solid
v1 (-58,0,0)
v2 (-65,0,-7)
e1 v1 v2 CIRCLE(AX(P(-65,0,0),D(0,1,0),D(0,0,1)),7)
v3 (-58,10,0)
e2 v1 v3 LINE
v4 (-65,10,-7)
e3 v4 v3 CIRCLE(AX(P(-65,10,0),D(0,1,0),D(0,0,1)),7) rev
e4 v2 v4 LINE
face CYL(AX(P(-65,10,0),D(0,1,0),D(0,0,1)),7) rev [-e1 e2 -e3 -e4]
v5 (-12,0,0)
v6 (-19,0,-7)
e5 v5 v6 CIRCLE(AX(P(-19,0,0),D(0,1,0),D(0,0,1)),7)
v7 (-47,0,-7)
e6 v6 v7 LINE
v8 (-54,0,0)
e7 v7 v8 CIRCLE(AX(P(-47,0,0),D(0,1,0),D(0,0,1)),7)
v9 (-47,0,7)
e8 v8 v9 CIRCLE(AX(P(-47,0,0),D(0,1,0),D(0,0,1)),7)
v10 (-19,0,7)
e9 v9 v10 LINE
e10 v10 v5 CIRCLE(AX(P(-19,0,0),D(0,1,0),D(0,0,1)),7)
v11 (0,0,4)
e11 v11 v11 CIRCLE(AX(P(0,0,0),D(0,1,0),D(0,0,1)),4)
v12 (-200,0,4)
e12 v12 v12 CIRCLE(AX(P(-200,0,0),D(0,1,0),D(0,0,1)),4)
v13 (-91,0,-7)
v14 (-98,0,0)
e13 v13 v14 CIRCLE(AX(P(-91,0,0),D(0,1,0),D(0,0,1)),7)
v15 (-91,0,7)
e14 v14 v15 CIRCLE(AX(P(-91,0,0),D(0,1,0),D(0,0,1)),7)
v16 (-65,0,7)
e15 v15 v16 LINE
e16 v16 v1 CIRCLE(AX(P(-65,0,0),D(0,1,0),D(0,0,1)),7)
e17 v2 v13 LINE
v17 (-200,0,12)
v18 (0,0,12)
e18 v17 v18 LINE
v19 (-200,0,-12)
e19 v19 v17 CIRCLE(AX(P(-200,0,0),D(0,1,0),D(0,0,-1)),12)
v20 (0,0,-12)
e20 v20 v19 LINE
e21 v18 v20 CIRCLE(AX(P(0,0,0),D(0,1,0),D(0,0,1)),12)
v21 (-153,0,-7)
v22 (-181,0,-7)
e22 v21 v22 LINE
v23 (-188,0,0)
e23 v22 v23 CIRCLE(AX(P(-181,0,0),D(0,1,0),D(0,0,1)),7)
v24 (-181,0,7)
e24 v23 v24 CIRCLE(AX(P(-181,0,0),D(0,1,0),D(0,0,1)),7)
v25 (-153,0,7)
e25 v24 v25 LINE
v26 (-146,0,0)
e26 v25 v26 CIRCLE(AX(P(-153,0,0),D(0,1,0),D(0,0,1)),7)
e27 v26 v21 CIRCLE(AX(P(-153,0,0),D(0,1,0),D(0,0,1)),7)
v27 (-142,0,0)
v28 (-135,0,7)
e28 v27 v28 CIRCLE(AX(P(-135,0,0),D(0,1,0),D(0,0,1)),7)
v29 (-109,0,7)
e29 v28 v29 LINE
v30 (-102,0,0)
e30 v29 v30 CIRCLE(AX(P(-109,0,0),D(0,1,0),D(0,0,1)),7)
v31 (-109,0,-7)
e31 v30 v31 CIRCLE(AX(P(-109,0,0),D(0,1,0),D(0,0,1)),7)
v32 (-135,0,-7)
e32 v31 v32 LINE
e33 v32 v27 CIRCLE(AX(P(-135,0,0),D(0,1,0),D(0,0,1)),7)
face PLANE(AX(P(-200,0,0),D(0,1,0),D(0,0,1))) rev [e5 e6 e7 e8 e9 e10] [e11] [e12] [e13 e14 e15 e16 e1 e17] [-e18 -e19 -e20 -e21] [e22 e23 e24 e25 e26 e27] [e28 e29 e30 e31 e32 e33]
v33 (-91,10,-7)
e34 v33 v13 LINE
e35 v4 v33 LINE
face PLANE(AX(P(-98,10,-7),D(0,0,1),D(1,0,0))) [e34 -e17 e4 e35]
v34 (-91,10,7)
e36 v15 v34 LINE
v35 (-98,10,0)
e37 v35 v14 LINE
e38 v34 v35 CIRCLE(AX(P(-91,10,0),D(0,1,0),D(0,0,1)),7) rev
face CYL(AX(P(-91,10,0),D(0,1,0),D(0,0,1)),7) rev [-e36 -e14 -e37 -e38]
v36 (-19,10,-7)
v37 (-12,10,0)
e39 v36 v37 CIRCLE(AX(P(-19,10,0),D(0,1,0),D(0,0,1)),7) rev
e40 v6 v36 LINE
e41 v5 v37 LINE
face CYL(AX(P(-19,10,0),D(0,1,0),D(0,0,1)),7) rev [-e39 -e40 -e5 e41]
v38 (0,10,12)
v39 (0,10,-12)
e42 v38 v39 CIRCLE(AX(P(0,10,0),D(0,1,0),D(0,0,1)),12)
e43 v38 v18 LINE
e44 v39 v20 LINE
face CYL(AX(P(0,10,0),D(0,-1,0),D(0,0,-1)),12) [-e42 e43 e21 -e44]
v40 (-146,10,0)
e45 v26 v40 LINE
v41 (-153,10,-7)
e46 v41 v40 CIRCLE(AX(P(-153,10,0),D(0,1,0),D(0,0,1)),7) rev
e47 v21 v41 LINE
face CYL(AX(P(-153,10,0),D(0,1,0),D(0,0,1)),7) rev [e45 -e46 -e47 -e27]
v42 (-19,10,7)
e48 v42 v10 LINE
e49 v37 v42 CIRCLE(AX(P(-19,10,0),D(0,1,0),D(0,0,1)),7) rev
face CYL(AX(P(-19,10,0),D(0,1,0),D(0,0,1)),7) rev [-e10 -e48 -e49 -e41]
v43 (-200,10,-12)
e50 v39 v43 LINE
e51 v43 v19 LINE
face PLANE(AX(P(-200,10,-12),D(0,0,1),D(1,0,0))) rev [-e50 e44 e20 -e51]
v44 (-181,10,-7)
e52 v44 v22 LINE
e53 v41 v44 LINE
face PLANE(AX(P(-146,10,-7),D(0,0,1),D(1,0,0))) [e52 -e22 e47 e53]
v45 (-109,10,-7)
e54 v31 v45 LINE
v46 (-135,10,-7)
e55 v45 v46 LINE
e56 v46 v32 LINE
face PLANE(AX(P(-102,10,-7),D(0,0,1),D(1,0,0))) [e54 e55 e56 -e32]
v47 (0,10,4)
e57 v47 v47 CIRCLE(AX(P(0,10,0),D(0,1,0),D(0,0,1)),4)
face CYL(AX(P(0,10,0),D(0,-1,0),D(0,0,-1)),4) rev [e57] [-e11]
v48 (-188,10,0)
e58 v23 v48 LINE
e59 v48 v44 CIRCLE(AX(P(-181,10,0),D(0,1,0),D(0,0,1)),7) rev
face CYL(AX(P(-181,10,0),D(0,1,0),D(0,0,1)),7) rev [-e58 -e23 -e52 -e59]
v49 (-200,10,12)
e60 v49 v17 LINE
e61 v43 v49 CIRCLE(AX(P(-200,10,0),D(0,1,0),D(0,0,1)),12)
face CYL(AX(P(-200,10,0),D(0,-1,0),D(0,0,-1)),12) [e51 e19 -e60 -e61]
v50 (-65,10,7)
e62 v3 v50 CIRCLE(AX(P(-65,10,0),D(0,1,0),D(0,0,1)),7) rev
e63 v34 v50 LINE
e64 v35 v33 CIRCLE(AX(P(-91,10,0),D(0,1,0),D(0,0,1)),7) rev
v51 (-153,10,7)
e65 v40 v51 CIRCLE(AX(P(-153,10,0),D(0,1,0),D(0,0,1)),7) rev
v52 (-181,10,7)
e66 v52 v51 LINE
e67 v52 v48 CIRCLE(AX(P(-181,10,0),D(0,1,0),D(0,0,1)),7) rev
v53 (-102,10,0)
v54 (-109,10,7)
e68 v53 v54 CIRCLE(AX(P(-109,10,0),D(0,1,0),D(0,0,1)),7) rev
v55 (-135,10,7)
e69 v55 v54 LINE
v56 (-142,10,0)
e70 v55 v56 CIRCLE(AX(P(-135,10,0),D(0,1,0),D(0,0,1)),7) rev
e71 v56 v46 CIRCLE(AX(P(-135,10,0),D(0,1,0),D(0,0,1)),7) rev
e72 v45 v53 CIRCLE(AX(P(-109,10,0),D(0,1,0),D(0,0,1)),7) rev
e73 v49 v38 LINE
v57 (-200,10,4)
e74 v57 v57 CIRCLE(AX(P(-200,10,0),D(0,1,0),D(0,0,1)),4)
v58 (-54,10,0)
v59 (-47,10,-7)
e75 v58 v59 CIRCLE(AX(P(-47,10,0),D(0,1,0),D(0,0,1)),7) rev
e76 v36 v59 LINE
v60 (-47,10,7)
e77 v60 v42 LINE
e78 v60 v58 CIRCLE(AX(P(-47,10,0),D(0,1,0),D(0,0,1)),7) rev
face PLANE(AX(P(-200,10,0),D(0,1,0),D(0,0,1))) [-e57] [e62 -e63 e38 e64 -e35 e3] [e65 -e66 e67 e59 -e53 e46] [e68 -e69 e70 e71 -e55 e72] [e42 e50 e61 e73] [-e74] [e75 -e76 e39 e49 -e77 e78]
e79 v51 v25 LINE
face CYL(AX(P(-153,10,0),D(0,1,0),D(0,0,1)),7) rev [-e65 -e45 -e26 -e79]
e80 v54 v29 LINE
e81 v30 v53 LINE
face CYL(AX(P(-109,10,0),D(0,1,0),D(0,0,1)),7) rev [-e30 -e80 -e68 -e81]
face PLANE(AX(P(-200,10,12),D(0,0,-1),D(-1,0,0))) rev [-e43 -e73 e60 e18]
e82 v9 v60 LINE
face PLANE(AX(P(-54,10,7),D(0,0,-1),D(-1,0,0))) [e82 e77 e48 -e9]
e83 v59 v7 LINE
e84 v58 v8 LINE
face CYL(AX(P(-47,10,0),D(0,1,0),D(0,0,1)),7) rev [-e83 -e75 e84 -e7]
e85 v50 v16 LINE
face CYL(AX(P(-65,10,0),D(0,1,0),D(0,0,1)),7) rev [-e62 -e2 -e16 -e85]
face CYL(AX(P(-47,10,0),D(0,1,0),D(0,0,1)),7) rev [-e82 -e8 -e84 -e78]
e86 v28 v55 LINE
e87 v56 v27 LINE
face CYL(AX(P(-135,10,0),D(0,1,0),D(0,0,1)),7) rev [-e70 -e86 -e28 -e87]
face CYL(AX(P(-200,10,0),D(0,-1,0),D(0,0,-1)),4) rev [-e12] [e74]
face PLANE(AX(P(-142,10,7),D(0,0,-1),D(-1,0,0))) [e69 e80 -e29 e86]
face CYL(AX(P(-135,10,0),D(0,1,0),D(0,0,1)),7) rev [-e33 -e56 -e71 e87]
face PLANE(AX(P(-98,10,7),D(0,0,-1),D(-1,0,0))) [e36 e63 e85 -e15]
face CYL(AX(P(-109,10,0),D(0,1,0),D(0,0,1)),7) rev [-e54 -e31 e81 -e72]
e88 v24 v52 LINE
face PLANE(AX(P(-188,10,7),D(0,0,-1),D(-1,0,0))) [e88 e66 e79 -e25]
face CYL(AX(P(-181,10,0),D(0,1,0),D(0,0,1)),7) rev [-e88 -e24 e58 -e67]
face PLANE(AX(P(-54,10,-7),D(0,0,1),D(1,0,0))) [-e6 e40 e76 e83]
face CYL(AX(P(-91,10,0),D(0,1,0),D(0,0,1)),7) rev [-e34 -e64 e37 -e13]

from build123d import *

# Parameters (mm, degrees)
SKETCH1_R           = 4
SKETCH1_W           = 42
SKETCH1_H           = 14
SKETCH1_W_2         = 40
BOSS_EXTRUDE1_DEPTH = 10
FILLET1_R           = 7


with BuildPart() as part:
    # Sketch1 → Boss-Extrude1 (new body)
    with BuildSketch(Plane(origin=(0, 0, 0), x_dir=(1, 0, 0), z_dir=(0, 1, 0))):
        with BuildLine():
            Line((-200, 12), (0, 12))
            ThreePointArc((0, 12), (12, 0), (0, -12))
            Line((0, -12), (-200, -12))
            ThreePointArc((-200, -12), (-205.477225575, -10.677078252), (-209.746794345, -7))
            ThreePointArc((-209.746794345, -7), (-212, 0), (-209.746794345, 7))
            ThreePointArc((-209.746794345, 7), (-205.477225575, 10.677078252), (-200, 12))
        make_face()
        with Locations(Location((-200, 0, 0), (0, 0, 270))):
            Circle(SKETCH1_R, mode=Mode.SUBTRACT)
        with Locations(Location((0, 0, 0), (0, 0, 270))):
            Circle(SKETCH1_R, mode=Mode.SUBTRACT)
        with Locations((-167, 0)):
            Rectangle(SKETCH1_W, SKETCH1_H, mode=Mode.SUBTRACT)
        with Locations((-122, 0)):
            Rectangle(SKETCH1_W_2, SKETCH1_H, mode=Mode.SUBTRACT)
        with Locations((-78, 0)):
            Rectangle(SKETCH1_W_2, SKETCH1_H, mode=Mode.SUBTRACT)
        with Locations((-33, 0)):
            Rectangle(SKETCH1_W, SKETCH1_H, mode=Mode.SUBTRACT)
    extrude(amount=BOSS_EXTRUDE1_DEPTH)

    # Fillet1
    fillet1_edges = [part.edges().sort_by_distance(p)[0] for p in [
        (-142, 5, -7),
        (-98, 5, -7),
        (-54, 5, -7),
        (-58, 5, -7),
        (-12, 5, -7),
        (-102, 5, -7),
        (-146, 5, -7),
        (-146, 5, 7),
        (-102, 5, 7),
        (-58, 5, 7),
        (-12, 5, 7),
        (-54, 5, 7),
        (-98, 5, 7),
        (-142, 5, 7),
        (-188, 5, 7),
        (-188, 5, -7),
    ]]
    fillet(fillet1_edges, radius=FILLET1_R - 0.0001)  # a hair under: the kernel refuses the full size


solid = part.part
